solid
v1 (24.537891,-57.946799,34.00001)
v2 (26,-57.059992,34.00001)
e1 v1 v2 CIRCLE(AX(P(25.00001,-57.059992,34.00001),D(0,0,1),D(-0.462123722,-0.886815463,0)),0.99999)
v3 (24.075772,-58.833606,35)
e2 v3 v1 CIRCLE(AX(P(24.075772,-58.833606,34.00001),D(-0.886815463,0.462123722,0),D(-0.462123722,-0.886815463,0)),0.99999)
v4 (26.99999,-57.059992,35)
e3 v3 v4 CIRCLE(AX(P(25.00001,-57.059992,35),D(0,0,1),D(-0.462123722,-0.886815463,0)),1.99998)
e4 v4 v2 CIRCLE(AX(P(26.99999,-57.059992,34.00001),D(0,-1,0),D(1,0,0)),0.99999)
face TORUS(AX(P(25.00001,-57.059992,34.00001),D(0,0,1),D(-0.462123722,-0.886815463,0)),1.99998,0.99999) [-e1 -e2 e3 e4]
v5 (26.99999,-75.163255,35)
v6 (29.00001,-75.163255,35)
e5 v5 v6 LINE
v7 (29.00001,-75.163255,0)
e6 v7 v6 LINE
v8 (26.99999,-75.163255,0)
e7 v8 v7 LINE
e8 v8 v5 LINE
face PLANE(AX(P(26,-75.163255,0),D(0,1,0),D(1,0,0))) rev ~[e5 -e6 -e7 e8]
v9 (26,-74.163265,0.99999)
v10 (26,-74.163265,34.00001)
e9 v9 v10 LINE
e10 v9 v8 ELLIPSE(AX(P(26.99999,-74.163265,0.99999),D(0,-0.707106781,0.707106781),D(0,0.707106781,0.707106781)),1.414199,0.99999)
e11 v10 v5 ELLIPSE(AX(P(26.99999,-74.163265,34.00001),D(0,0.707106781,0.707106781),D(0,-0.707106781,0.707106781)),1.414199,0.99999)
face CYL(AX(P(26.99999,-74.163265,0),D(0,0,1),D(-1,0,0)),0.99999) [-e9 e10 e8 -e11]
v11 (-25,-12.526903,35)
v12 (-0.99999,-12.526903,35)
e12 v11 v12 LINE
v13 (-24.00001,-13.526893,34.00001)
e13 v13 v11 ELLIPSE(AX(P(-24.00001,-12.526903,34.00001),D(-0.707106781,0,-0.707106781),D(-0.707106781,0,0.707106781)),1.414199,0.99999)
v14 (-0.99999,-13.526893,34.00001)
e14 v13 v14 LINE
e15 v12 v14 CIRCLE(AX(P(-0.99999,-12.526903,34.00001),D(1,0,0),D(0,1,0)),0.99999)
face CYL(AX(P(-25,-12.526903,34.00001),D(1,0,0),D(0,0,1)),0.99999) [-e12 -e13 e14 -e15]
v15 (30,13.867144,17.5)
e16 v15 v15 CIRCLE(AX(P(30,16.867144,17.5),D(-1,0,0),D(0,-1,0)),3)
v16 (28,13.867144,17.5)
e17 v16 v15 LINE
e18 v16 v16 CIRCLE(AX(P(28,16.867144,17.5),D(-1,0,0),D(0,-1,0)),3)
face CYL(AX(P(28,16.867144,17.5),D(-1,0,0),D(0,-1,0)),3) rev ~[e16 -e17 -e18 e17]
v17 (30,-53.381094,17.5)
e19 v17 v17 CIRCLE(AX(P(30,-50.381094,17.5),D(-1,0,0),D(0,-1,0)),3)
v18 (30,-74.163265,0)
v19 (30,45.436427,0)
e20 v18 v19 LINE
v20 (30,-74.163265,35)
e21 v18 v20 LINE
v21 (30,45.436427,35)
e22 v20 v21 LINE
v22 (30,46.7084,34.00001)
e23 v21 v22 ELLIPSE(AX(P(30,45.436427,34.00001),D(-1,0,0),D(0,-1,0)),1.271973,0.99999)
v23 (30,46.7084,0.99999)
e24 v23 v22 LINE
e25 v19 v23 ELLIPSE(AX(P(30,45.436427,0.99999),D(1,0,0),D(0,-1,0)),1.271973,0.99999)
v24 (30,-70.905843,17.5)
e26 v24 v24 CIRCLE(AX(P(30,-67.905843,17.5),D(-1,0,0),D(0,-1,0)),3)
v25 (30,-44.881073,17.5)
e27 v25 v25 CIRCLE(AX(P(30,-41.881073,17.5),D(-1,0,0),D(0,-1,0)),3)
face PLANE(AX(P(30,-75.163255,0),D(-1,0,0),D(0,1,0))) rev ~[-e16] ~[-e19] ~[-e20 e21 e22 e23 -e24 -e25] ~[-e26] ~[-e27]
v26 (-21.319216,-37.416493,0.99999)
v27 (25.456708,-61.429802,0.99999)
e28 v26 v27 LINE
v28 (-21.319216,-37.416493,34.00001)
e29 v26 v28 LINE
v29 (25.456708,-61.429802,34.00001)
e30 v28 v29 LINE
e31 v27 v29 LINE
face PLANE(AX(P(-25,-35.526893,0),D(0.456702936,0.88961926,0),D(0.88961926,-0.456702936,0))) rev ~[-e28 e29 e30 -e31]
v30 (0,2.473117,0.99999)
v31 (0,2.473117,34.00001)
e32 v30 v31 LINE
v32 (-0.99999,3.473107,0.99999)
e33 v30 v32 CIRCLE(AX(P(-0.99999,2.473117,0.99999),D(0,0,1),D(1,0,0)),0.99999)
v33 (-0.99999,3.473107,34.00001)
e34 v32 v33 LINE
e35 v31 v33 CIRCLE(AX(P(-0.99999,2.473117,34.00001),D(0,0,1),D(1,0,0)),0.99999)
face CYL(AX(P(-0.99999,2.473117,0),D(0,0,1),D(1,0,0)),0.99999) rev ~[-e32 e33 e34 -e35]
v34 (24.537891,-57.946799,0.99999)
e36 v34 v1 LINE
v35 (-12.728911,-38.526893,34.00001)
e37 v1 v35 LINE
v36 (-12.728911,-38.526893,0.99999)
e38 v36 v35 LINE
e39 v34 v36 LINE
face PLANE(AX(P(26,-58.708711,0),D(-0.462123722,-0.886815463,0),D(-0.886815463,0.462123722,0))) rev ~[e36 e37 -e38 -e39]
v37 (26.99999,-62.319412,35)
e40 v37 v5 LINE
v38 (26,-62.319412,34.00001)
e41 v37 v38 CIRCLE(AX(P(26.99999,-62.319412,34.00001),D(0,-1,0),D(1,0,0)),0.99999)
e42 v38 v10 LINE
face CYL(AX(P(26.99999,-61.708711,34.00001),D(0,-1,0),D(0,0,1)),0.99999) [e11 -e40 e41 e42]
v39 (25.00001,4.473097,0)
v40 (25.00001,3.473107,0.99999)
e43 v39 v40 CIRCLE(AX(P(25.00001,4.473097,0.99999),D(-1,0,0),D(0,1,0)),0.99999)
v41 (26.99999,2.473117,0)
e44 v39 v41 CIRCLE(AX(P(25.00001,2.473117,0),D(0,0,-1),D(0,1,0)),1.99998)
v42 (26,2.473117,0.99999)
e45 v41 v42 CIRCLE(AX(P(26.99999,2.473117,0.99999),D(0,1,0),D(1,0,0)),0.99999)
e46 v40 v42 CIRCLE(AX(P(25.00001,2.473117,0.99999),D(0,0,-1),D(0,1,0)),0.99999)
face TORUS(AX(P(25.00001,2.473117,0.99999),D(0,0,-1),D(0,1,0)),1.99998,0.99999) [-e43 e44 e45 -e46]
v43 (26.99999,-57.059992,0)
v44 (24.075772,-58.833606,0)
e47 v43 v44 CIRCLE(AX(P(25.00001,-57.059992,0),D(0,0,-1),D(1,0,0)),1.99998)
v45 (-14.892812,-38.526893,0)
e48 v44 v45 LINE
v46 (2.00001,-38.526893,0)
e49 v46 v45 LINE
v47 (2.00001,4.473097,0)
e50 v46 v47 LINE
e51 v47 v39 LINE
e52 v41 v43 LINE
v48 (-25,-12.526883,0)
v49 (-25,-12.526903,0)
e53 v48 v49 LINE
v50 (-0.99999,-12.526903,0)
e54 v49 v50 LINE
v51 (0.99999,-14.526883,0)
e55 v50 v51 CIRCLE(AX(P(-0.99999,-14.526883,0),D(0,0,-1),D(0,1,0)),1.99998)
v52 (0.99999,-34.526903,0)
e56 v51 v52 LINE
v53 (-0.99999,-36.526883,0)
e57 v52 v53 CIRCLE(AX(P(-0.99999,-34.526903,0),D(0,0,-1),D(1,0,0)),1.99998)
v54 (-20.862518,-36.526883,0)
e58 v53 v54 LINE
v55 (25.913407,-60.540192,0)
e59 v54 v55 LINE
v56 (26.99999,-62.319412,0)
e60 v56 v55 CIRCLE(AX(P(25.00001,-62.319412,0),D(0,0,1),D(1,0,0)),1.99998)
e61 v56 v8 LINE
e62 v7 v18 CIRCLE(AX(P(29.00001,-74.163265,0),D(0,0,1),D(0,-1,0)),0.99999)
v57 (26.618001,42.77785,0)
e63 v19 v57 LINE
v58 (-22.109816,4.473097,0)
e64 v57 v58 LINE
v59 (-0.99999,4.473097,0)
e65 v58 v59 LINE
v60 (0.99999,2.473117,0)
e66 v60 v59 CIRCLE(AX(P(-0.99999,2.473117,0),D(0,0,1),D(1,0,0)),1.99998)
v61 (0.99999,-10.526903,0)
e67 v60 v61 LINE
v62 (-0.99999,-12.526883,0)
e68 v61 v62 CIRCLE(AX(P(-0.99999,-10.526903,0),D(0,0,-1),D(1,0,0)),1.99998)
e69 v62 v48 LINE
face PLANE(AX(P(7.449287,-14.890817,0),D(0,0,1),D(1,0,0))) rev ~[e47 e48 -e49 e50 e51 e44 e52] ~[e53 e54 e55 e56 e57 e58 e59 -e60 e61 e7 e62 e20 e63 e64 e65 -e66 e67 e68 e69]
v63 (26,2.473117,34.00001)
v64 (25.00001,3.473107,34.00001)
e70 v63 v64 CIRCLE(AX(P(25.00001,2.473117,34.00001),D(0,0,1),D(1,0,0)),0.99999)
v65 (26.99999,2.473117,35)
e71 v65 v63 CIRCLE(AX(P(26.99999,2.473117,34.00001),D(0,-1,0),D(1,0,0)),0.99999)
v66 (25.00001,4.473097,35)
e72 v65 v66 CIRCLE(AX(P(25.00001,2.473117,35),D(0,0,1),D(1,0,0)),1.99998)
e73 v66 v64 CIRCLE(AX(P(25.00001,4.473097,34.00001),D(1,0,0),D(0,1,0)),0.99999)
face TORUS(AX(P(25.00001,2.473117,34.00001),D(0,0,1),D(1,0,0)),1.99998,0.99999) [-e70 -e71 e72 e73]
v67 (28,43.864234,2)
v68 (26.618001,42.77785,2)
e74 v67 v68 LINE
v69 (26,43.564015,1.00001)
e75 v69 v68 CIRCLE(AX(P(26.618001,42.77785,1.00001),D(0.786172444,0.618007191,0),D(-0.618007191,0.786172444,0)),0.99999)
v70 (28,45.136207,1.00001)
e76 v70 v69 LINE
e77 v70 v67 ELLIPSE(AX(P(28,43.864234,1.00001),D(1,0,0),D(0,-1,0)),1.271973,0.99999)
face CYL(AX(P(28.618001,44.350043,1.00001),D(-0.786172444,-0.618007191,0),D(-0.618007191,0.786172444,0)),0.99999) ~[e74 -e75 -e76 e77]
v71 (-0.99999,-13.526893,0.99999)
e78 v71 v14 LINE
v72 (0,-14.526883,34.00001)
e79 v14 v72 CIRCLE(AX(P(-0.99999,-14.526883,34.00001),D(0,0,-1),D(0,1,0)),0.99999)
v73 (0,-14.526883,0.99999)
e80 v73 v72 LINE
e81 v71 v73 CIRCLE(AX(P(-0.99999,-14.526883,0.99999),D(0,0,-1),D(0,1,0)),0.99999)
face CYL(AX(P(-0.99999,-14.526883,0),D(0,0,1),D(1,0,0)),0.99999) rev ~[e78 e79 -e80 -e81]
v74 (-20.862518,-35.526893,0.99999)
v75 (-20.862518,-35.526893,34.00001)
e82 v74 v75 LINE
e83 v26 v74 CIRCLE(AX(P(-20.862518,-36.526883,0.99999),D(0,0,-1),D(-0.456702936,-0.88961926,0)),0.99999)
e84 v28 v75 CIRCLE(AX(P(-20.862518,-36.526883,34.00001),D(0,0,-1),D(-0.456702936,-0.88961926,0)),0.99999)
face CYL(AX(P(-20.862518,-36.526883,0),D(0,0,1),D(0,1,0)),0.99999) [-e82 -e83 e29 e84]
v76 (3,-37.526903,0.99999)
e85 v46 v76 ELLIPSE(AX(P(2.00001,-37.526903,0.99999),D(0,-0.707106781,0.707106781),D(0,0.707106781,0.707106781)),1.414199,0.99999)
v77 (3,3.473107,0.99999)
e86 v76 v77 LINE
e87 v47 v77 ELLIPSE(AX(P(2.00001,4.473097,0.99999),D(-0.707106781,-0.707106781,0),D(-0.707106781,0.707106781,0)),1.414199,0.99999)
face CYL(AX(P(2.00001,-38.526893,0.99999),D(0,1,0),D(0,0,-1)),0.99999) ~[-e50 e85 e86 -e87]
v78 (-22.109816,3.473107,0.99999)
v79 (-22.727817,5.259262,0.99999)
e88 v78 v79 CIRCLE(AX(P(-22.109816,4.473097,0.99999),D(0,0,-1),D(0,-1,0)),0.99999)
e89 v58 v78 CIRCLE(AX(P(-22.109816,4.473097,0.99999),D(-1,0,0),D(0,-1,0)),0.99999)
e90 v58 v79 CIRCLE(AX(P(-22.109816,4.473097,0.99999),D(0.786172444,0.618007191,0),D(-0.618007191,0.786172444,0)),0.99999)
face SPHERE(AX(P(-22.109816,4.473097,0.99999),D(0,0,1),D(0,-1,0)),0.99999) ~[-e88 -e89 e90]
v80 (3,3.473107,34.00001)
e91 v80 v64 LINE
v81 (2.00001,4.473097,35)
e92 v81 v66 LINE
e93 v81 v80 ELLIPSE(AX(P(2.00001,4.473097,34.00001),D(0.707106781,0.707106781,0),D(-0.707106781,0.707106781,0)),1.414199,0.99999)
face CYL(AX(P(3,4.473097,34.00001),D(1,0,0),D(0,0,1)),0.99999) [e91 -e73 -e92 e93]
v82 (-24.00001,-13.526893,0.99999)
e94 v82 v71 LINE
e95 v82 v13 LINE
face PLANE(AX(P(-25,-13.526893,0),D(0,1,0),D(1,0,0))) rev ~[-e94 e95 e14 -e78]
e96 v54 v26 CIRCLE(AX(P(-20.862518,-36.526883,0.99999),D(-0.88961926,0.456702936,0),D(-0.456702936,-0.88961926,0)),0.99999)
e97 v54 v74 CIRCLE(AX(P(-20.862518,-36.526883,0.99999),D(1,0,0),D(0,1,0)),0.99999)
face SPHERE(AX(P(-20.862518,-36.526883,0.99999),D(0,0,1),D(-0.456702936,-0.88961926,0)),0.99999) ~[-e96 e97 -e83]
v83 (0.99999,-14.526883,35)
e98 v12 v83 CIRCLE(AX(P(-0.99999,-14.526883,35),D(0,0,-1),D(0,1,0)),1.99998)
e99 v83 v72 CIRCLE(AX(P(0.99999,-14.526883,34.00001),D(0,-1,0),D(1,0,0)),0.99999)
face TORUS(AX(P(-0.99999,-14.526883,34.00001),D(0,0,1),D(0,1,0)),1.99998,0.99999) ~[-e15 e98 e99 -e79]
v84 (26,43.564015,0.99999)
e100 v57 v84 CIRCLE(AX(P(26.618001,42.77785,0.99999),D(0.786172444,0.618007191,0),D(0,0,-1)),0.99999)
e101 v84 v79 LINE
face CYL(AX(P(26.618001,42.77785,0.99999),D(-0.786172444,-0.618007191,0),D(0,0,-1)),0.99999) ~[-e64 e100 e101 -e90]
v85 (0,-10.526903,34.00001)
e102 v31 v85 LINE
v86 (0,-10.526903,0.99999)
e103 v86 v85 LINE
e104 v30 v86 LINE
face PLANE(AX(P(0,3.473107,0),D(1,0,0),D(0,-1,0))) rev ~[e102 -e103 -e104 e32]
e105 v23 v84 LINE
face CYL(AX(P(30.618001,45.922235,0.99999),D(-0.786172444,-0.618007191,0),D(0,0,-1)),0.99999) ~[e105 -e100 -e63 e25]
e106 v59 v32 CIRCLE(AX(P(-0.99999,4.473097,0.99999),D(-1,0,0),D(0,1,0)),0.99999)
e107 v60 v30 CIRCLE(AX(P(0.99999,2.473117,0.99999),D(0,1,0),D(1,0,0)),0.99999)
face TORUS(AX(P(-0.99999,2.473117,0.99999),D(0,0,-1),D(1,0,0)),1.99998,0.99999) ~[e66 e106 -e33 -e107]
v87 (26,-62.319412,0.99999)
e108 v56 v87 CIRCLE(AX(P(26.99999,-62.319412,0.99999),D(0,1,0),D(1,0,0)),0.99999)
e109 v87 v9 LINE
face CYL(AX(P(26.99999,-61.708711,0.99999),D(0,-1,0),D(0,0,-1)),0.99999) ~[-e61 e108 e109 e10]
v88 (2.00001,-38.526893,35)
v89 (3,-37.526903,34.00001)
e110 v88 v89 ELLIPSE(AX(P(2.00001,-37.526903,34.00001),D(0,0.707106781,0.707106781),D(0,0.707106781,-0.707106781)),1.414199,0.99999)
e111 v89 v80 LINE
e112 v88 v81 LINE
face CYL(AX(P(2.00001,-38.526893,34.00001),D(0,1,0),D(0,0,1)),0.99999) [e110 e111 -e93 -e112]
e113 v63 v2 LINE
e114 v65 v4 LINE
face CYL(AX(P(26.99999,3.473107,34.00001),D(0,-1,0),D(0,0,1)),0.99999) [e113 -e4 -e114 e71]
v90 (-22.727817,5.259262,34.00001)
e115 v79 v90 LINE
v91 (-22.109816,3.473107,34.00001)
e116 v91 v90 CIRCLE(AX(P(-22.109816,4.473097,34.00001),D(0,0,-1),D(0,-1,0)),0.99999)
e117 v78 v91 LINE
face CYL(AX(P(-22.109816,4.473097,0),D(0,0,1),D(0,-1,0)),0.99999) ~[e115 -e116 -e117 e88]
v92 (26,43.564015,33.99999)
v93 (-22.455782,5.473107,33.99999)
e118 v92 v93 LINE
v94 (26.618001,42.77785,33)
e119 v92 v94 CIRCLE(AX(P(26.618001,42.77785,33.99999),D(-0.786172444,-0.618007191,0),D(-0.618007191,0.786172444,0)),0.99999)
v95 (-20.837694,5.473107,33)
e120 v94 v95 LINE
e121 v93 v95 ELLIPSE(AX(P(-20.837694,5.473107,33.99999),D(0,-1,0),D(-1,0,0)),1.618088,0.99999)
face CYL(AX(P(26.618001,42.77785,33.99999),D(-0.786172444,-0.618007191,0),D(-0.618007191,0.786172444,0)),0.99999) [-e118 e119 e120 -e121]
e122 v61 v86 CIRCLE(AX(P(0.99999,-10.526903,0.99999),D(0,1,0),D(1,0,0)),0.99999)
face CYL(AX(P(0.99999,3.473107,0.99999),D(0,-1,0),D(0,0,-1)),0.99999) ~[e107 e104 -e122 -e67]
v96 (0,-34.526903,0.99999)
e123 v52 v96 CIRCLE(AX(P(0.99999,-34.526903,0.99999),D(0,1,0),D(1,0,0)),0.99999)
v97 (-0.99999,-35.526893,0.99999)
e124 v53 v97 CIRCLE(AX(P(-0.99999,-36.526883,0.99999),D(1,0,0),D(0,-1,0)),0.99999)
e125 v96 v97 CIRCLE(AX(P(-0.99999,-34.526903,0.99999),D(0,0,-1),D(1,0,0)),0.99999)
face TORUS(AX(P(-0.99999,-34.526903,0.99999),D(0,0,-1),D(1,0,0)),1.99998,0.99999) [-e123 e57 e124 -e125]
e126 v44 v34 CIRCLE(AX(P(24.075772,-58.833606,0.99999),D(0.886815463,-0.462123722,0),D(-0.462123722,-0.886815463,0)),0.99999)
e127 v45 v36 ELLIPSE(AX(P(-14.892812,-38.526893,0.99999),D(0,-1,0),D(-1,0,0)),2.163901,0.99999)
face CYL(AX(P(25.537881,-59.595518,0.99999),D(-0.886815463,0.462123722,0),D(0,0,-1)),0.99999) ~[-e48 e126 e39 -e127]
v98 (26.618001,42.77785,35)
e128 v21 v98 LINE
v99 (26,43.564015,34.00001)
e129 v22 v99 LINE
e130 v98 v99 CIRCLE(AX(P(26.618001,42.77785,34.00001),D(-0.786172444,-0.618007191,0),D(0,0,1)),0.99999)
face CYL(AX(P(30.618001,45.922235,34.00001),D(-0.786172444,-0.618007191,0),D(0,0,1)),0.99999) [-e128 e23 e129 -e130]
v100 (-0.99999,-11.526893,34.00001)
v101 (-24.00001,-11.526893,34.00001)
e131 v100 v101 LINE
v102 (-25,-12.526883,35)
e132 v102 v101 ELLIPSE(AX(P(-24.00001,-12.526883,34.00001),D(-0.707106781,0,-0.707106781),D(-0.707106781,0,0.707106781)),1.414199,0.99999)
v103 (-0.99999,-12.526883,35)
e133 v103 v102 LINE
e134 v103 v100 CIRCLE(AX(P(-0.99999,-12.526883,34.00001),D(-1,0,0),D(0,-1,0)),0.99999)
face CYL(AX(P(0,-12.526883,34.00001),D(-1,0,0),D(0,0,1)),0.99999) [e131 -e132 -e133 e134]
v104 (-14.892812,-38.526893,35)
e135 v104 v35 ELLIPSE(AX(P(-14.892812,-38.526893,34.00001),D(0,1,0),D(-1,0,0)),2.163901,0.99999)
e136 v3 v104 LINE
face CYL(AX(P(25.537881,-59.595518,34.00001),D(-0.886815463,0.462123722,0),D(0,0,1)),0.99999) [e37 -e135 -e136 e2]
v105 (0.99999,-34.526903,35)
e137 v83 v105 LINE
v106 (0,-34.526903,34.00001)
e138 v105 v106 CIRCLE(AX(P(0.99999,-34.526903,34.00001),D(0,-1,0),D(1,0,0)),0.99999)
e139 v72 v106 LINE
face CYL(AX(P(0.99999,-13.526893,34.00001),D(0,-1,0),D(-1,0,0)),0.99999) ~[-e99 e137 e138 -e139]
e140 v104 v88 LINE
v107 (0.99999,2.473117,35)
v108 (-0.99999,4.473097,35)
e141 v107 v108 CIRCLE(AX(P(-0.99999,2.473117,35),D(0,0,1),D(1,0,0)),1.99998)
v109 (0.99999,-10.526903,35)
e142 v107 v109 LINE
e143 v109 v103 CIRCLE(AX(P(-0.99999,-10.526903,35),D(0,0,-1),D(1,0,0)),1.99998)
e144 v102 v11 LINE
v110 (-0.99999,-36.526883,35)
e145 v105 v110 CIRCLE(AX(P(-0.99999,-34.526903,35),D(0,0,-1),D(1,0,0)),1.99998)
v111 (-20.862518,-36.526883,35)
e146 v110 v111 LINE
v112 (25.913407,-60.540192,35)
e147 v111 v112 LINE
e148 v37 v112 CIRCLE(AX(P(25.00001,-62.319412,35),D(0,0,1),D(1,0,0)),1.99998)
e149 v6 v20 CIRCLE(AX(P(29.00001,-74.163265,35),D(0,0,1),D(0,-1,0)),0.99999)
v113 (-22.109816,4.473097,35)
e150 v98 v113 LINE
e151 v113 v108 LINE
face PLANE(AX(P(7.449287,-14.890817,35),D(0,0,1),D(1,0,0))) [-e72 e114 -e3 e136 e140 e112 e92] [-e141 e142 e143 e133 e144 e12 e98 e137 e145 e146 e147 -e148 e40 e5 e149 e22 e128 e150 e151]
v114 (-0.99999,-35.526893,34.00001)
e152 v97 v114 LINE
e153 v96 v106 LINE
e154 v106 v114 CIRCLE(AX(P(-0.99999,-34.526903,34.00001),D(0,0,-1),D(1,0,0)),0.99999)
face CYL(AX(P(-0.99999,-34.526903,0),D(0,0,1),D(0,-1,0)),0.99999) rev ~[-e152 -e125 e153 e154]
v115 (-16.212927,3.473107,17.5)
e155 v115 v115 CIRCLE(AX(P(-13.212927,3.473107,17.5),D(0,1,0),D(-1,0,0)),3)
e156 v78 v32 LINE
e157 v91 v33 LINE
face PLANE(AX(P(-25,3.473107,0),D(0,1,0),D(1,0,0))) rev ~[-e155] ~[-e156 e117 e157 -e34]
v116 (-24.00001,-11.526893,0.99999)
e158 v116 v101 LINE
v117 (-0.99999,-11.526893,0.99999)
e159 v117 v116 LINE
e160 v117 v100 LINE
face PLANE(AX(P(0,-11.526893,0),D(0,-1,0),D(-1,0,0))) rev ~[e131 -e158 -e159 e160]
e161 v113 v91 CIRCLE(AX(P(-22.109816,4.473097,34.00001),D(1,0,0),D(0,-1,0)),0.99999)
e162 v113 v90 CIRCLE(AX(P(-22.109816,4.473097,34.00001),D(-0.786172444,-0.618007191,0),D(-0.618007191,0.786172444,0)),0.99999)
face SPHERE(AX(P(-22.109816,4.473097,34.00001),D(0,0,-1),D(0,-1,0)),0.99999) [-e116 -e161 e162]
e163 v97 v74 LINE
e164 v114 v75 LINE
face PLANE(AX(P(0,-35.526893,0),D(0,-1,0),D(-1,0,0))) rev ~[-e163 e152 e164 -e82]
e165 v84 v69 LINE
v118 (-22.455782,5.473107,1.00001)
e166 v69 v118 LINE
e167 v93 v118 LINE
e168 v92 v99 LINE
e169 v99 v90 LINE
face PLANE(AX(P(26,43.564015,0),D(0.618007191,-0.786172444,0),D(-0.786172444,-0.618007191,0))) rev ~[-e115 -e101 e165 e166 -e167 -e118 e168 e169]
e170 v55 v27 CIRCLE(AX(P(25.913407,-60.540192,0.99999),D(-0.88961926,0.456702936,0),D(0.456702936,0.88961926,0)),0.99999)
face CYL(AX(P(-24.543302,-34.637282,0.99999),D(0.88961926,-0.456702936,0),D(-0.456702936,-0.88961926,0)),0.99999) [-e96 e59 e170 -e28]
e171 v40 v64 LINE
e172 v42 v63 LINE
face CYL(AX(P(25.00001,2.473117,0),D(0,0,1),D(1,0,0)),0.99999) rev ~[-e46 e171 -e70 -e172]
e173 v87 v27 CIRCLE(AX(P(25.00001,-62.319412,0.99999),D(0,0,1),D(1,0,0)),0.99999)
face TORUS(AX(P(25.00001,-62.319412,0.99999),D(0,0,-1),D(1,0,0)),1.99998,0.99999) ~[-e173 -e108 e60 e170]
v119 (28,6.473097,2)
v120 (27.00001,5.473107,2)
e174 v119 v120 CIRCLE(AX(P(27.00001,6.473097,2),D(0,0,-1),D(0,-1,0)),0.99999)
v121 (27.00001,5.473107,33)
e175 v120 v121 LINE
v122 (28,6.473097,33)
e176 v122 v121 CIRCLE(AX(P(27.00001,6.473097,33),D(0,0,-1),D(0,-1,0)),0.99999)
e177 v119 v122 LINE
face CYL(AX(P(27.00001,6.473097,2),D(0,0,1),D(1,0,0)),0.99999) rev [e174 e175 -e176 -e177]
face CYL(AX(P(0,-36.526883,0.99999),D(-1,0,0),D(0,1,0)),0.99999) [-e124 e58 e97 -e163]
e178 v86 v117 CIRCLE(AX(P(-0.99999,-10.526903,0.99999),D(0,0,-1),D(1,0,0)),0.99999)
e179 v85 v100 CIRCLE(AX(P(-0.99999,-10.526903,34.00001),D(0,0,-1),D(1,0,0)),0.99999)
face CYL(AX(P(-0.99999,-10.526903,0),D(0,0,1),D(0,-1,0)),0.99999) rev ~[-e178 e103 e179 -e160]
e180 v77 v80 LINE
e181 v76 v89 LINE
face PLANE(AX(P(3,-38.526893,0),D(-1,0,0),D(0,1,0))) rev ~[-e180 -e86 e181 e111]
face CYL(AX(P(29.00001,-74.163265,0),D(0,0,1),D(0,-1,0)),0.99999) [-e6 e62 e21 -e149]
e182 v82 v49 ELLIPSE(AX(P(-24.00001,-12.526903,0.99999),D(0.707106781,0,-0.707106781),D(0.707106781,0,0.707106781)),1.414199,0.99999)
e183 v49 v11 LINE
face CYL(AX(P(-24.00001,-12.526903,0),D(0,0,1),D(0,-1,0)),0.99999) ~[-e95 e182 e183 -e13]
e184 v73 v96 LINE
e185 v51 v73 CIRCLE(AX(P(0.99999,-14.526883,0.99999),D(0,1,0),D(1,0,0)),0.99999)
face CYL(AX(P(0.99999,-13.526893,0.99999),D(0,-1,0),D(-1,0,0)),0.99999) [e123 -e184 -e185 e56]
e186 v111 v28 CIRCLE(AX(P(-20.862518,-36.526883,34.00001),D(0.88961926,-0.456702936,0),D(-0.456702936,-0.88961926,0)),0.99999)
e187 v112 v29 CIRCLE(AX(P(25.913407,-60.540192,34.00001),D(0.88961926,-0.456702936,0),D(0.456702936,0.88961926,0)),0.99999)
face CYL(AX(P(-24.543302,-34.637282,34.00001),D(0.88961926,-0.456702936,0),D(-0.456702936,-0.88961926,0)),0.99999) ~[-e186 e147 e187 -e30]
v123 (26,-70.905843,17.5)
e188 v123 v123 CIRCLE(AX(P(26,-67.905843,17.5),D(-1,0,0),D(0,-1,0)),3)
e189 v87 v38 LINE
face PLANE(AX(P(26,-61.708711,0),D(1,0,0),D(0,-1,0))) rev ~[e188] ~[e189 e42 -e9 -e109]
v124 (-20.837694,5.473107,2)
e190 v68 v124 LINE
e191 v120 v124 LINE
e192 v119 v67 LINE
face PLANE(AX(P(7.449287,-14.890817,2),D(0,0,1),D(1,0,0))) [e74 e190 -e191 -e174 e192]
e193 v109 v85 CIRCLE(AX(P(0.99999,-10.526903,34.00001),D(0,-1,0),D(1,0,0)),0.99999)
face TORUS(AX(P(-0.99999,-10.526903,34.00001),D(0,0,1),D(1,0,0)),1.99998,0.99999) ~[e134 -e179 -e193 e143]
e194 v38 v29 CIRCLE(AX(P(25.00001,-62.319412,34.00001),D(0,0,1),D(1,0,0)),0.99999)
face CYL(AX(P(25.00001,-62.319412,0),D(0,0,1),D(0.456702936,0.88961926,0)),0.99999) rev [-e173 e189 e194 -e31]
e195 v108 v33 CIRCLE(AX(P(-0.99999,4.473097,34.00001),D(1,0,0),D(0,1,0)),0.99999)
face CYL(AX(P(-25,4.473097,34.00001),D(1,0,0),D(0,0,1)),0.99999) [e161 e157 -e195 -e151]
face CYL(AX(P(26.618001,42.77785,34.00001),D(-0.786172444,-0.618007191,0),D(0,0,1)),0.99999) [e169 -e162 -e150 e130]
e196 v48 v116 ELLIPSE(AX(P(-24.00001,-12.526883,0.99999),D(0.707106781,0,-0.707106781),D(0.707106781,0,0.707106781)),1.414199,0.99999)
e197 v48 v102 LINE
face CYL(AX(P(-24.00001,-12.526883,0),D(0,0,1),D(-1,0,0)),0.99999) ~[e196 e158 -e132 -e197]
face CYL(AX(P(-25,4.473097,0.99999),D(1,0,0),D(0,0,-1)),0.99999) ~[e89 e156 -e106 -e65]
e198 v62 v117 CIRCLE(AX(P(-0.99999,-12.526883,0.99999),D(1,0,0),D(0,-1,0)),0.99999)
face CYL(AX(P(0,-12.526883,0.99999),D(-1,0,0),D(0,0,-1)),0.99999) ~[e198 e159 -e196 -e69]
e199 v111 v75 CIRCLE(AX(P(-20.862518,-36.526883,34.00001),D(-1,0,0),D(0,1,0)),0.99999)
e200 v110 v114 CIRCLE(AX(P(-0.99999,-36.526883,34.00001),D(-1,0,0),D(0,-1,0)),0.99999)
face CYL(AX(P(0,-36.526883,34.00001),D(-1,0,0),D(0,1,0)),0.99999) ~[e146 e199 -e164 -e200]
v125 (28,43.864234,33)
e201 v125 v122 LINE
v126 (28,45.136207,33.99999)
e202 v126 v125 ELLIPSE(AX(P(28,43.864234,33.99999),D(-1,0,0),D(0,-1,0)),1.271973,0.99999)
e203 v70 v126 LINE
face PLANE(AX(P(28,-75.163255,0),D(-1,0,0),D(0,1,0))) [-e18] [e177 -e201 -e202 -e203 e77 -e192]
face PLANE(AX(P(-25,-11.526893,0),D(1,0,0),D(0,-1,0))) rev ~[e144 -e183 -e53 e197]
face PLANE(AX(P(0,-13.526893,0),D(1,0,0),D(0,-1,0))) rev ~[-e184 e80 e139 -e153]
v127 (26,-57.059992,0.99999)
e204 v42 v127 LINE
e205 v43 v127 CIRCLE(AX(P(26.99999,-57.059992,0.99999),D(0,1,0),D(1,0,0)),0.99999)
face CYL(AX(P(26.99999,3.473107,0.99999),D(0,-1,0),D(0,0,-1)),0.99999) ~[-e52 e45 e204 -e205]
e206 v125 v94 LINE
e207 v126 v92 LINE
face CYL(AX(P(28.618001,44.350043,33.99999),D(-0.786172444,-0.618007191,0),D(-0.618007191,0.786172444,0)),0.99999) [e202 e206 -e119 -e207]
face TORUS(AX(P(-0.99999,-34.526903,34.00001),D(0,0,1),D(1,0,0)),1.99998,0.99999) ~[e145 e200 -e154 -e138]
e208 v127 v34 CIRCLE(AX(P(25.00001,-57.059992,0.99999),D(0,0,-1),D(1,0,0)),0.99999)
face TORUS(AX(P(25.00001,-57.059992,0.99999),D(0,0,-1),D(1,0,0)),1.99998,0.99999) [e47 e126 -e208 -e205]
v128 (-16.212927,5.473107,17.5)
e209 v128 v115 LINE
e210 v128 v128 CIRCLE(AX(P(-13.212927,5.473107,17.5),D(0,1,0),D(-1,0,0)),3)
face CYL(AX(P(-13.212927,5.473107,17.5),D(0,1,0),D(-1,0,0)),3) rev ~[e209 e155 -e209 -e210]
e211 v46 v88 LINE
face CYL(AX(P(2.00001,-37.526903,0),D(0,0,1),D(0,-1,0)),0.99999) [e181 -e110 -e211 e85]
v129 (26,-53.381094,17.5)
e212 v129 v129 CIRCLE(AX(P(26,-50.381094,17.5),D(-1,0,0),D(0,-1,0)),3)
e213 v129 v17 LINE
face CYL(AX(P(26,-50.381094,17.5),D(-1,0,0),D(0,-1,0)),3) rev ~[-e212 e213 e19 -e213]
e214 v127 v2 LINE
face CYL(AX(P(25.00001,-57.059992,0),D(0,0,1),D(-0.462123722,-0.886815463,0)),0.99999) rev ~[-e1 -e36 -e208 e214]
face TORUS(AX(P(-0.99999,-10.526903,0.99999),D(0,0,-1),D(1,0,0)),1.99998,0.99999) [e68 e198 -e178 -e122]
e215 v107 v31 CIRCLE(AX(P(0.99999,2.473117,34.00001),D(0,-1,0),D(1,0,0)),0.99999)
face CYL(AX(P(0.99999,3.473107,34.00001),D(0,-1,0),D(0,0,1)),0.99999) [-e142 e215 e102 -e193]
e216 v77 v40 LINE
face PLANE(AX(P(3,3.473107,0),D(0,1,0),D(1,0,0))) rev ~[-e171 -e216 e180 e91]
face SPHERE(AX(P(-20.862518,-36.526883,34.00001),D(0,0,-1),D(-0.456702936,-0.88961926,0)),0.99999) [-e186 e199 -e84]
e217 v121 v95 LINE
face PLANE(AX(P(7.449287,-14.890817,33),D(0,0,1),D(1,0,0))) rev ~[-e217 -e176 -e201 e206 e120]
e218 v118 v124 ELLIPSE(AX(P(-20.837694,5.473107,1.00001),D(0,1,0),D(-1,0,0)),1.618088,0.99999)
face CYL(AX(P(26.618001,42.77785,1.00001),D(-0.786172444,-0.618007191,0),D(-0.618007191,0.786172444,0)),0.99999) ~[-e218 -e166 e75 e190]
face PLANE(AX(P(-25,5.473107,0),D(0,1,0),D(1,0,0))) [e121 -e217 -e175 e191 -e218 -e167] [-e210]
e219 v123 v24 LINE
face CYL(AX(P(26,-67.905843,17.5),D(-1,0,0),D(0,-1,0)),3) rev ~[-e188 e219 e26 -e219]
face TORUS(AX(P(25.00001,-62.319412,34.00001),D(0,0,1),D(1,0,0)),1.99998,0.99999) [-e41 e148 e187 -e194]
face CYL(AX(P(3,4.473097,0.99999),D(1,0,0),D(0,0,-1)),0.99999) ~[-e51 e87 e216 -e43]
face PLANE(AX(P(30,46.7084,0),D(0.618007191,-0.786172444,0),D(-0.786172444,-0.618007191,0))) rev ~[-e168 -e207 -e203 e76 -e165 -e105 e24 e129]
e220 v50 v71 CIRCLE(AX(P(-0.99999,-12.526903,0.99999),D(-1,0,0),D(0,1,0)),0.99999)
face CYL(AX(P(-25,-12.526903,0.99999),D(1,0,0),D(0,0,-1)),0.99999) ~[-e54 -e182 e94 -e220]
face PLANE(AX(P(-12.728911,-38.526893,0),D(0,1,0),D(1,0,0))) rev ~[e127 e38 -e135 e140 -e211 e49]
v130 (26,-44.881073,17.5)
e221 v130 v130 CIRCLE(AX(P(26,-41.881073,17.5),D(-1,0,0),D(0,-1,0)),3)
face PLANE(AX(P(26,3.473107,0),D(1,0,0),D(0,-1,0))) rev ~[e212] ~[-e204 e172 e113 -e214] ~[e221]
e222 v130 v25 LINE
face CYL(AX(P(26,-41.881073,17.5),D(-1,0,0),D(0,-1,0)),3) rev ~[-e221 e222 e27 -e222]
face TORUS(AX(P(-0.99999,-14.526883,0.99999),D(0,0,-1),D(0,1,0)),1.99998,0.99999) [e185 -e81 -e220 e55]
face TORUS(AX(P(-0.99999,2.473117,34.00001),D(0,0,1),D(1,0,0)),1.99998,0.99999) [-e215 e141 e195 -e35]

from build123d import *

# Parameters (mm, degrees)
F1_DEPTH    = 35
F3_T        = 2
F3_T3_DEPTH = 39
F4_R        = 3
F5_DEPTH    = 25
F6_R        = 3
F7_DEPTH    = 5.9
F8_R        = 0.99999
F9_R        = 3
F10_DEPTH   = 25
F11_R       = 3
F12_DEPTH   = 25


# Not quite as in the source:
# - a fillet or chamfer is up to 0.001 mm smaller than in the source, because OpenCascade refuses the exact size
# - a shell that OpenCascade refuses in one call is made with other operations: the cavity is built on its own and cut out
# - a feature names something its author has since deleted; it is built from what else it names


with BuildPart() as f1:
    # F0 (on Top) → F1 (new body)
    with BuildSketch(Plane.XY):
        Polygon((0, -35.5268927627), (-25, -35.5268927627), (26, -61.7087109445), (26, -75.1632548192), (30, -75.1632548192), (30, 43.5640147483), (30, 46.7083996511), (26, 43.5640147483), (-25, 3.4731072373), (0, 3.4731072373), (0, -11.5268927627), (-25, -11.5268927627), (-25, -13.5268927627), (0, -13.5268927627), align=None)
        Polygon((3, -38.5268927627), (3, 3.4731072373), (26, 3.4731072373), (26, -58.7087109445), (-12.7289108932, -38.5268927627), align=None, mode=Mode.SUBTRACT)
    extrude(amount=F1_DEPTH)

    # F3: shell of thickness 2, made by hand


with BuildPart() as f3_core1:
    # F3_t2: copy of F1
    add(f1.part)

    # the walls: a layer under each face that stays
    f3_faces = [f3_core1.faces().sort_by_distance(p)[0] for p in [
        (-12.5, 3.4731072373, 17.5),
        (2.5, -14.227427584, 35),
        (-4.8644554466, -38.5268927627, 17.5),
        (6.6355445534, -48.6178018536, 17.5),
        (26, -27.6178018536, 17.5),
        (14.5, 3.4731072373, 17.5),
        (3, -17.5268927627, 17.5),
        (30, -14.227427584, 17.5),
        (28, -75.1632548192, 17.5),
        (26, -68.4359828818, 17.5),
        (0.5, -48.6178018536, 17.5),
        (-12.5, -35.5268927627, 17.5),
        (0, -24.5268927627, 17.5),
        (-12.5, -13.5268927627, 17.5),
        (-25, -12.5268927627, 17.5),
        (-12.5, -11.5268927627, 17.5),
        (2.5, -14.227427584, 0),
        (0, -4.0268927627, 17.5),
    ]]
    thicken(f3_faces, amount=-F3_T, mode=Mode.SUBTRACT)

    # F3_s4 → F3_t3 (cut)
    with BuildSketch(Plane.XY.offset(-2)):
        Polygon((-0.02, 3.4531072373), (0, 5.4731072373), (2, 5.4731072373), (2, 3.4731072373), align=None)
        Polygon((-12.7196684188, -38.5291564534), (-12.7289108932, -36.5268927627), (-20.8947564215, -36.5268927627), (-13.6531583366, -40.3005236892), align=None)
        Polygon((25.9892424744, -58.6909746353), (25.0757525566, -60.482341871), (28, -62.0061810098), (28, -58.7087109445), align=None)
        Polygon((25.98, 3.4531072373), (28, 3.4731072373), (28, 5.4731072373), (26, 5.4731072373), align=None)
        Polygon((3.02, 3.4531072373), (3, 5.4731072373), (1, 5.4731072373), (1, 3.4731072373), align=None)
        Polygon((25.9708659413, -61.7265033297), (28, -61.7087109445), (28, -60.4872961474), (26.9134058716, -59.9294724238), align=None)
        Polygon((-0.02, -35.5068927627), (0, -37.5268927627), (2, -37.5268927627), (2, -35.5268927627), align=None)
        Polygon((-0.02, -13.5468927627), (2, -13.5268927627), (2, -11.5268927627), (0, -11.5268927627), align=None)
        Polygon((-0.02, -11.5068927627), (0, -13.5268927627), (2, -13.5268927627), (2, -11.5268927627), align=None)
    extrude(amount=F3_T3_DEPTH, mode=Mode.SUBTRACT)


with BuildPart() as f1_1:
    add(f1.part)

    # what is left inside the walls is the cavity
    f3_cavity = [f3_core1.part.solids().sort_by_distance(p)[0] for p in [
        (2.784469, 25.288934, 22.666667),
    ]]
    add(f3_cavity, mode=Mode.SUBTRACT)

    # F4 (on face) → F5 (cut)
    with BuildSketch(Plane(origin=(28, 0, 0), x_dir=(0, -1, 0), z_dir=(-1, 0, 0))):
        with Locations((-16.8671440333, 17.5)):
            Circle(F4_R)
    extrude(amount=-F5_DEPTH, mode=Mode.SUBTRACT)

    # F6 (on face) → F7 (cut)
    with BuildSketch(Plane(origin=(0, 5.4731072373, 0), x_dir=(-1, 0, 0), z_dir=(0, 1, 0))):
        with Locations((13.21292707, 17.5)):
            Circle(F6_R)
    extrude(amount=-F7_DEPTH, mode=Mode.SUBTRACT)

    # F8 (radius 1 in the source; OpenCascade refuses exactly that, so slightly less here)
    f8_edges = [f1_1.edges().sort_by_distance(p)[0] for p in [
        (2.5, 25.090753, 35),
        (2.5, 25.090753, 0),
        (-25, 3.473107, 17.5),
        (-12.5, 3.473107, 35),
        (-12.5, 3.473107, 0),
        (0, 3.473107, 17.5),
        (0, -11.526893, 17.5),
        (0, -13.526893, 17.5),
        (-25, -13.526893, 17.5),
        (-12.5, -13.526893, 0),
        (-12.5, -13.526893, 35),
        (-25, -11.526893, 17.5),
        (0, -35.526893, 17.5),
        (-25, -35.526893, 17.5),
        (0.5, -48.617802, 35),
        (0.5, -48.617802, 0),
        (26, -61.708711, 17.5),
        (3, -17.526893, 35),
        (6.635545, -48.617802, 35),
        (26, -27.617802, 35),
        (14.5, 3.473107, 35),
        (3, -17.526893, 0),
        (14.5, 3.473107, 0),
        (26, -27.617802, 0),
        (6.635545, -48.617802, 0),
        (26, -75.163255, 17.5),
        (3, -38.526893, 17.5),
        (26, -58.708711, 17.5),
        (26, 3.473107, 17.5),
        (2.772109, 25.304657, 33),
        (2.772109, 25.304657, 2),
        (0, -4.026893, 0),
        (-12.5, -11.526893, 0),
        (0, -24.526893, 0),
        (-12.5, -35.526893, 0),
        (26, -68.435983, 0),
        (0, -4.026893, 35),
        (-12.5, -11.526893, 35),
        (0, -24.526893, 35),
        (-12.5, -35.526893, 35),
        (26, -68.435983, 35),
        (30, -75.163255, 17.5),
        (28, 5.473107, 17.5),
    ]]
    fillet(f8_edges, radius=F8_R)

    # F9 (on face) → F10 (cut)
    with BuildSketch(Plane(origin=(26, 0, 0), x_dir=(0, -1, 0), z_dir=(-1, 0, 0))):
        with Locations((50.3810942173, 17.5)):
            Circle(F9_R)
        with Locations((41.8810732663, 17.5000000745)):
            Circle(F9_R)
    extrude(amount=-F10_DEPTH, mode=Mode.SUBTRACT)

    # F11 (on face) → F12 (cut)
    with BuildSketch(Plane(origin=(26, 0, 0), x_dir=(0, -1, 0), z_dir=(-1, 0, 0))):
        with Locations((67.9058432579, 17.5)):
            Circle(F11_R)
    extrude(amount=-F12_DEPTH, mode=Mode.SUBTRACT)


solid = f1_1.part
